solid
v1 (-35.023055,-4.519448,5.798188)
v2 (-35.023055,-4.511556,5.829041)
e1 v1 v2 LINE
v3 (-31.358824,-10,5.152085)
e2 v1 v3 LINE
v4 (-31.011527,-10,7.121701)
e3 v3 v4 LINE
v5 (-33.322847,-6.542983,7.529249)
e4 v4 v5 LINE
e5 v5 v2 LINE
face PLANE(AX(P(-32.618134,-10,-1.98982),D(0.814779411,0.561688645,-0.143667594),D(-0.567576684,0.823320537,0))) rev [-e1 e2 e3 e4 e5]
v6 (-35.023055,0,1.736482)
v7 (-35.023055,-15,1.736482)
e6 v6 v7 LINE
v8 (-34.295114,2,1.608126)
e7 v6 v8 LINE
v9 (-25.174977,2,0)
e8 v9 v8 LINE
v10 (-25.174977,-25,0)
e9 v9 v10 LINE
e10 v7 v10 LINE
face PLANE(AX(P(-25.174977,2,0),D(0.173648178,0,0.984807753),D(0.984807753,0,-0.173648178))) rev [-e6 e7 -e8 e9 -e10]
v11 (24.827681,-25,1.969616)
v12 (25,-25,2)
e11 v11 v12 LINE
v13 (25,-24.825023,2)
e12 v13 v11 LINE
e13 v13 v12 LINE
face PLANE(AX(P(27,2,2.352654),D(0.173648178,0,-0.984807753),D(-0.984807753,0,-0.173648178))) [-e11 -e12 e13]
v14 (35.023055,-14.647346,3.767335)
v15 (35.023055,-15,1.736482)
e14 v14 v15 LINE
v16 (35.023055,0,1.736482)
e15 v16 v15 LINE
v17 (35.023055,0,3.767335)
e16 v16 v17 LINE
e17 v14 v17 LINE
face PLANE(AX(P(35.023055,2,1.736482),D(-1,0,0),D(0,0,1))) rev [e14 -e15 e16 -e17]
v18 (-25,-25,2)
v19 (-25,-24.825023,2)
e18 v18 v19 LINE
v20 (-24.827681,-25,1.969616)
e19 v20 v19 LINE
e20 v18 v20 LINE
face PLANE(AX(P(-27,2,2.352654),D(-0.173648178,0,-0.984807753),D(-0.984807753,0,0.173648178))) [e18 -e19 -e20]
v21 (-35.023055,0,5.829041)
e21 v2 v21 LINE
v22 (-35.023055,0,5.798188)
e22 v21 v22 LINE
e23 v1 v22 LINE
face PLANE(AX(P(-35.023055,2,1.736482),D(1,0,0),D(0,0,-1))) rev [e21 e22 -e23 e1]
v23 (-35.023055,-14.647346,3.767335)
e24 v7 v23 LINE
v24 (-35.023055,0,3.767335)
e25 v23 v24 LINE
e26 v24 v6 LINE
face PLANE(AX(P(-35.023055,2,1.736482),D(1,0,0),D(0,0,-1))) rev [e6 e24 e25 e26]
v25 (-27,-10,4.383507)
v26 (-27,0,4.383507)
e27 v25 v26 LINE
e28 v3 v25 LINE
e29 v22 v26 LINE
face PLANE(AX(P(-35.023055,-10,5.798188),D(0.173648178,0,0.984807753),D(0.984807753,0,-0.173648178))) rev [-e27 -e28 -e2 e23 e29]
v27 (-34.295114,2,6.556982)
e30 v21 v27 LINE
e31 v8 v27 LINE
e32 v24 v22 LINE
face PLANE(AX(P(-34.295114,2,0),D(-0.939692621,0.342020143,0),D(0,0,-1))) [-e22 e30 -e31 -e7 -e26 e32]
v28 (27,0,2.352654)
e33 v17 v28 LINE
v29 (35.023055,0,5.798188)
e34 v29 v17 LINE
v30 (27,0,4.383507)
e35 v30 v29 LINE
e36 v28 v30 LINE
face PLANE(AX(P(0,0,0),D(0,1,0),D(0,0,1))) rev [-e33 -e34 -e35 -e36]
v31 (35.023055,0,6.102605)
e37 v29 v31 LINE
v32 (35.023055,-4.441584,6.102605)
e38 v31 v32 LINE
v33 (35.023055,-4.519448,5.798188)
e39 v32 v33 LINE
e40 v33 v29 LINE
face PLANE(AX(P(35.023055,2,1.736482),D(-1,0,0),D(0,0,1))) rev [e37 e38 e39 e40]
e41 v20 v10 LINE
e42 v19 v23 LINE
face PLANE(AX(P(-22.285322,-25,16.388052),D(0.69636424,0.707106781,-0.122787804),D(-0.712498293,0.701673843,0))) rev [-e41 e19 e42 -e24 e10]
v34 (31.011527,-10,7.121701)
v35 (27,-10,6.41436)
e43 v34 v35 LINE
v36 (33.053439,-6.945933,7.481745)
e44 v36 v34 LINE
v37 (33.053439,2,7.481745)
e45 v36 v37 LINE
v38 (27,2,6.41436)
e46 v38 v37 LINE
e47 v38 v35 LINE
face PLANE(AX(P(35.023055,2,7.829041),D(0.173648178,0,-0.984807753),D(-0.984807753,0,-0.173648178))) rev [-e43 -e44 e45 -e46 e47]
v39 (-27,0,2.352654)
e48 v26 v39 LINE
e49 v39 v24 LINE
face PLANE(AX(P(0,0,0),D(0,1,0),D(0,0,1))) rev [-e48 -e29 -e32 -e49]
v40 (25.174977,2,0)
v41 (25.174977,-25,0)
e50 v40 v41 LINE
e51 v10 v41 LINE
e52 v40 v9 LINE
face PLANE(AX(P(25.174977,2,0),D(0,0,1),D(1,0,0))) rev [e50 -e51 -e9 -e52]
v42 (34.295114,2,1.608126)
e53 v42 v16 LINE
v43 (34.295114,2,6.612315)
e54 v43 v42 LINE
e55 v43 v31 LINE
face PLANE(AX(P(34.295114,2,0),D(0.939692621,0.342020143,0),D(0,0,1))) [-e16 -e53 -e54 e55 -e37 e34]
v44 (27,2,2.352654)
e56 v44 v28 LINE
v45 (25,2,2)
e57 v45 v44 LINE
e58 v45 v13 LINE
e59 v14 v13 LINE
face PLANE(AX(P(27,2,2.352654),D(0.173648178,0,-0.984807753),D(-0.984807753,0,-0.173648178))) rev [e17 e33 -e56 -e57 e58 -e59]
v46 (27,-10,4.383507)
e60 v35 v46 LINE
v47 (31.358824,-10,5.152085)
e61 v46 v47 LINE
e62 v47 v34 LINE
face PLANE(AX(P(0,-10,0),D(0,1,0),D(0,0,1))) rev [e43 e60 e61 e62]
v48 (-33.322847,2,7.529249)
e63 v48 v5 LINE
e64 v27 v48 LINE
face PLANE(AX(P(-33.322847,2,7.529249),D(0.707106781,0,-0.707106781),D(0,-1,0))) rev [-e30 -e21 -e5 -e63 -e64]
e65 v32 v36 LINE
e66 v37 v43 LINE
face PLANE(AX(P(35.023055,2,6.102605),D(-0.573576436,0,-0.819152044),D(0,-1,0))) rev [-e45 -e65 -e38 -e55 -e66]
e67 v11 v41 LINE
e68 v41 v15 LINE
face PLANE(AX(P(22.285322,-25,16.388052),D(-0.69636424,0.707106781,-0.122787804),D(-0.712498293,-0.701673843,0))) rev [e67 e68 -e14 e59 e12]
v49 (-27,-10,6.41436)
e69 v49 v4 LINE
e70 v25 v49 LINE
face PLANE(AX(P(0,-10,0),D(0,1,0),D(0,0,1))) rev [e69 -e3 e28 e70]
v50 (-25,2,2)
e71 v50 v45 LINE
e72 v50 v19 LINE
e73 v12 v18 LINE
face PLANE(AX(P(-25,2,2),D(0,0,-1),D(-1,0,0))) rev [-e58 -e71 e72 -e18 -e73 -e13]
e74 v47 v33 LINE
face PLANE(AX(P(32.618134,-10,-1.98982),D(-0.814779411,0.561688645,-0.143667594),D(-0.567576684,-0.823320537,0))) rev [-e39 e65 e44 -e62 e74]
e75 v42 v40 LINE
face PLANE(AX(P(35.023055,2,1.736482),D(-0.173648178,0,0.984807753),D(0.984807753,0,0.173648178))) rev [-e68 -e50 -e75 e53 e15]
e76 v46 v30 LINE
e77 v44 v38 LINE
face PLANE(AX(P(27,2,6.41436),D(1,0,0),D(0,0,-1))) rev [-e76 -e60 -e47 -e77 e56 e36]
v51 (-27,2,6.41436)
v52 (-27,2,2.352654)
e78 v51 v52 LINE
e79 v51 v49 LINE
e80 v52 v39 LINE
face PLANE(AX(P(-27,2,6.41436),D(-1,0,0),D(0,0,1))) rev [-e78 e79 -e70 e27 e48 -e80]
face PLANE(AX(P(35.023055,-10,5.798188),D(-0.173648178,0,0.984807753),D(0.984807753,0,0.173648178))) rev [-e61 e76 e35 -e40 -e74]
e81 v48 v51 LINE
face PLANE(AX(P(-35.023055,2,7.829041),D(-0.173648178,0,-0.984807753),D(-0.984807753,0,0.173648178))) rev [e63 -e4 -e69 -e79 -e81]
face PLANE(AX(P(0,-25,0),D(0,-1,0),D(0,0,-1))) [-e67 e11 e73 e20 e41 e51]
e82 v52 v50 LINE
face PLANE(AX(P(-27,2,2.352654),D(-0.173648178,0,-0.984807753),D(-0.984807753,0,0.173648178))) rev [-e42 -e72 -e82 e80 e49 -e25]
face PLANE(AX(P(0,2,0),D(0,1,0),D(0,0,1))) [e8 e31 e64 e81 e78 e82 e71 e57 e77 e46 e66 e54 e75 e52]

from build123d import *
from OCP.BRepFilletAPI import BRepFilletAPI_MakeChamfer

# Parameters (mm, degrees)
BOSS_EXTRUDE1_DEPTH = 2
BOSS_EXTRUDE2_DEPTH = 25
BOSS_EXTRUDE3_DEPTH = 10
CUT_EXTRUDE4_DEPTH  = 2
CUT_EXTRUDE5_DEPTH  = 2
CUT_EXTRUDE6_DEPTH  = 2
CUT_EXTRUDE7_DEPTH  = 2
CHAMFER1_SIZE       = 0.727940469
CHAMFER1_SIZE_2     = 2
CHAMFER2_SIZE       = 2
CHAMFER2_SIZE2      = 1.72643598


with BuildPart() as part:
    # Sketch12 → Boss-Extrude1 (new body)
    with BuildSketch(Plane(origin=(0, 0, 0), x_dir=(1, 0, 0), z_dir=(0, 1, 0))):
        Polygon((-27, -6.414360409), (-27, -2.352653961), (-25, -2), (25, -2), (27, -2.352653961), (27, -6.414360409), (35.023054857, -7.829041448), (35.023054857, -1.736481777), (25.174977327, 0), (-25.174977327, 0), (-35.023054857, -1.736481777), (-35.023054857, -7.829041448), align=None)
    extrude(amount=BOSS_EXTRUDE1_DEPTH)

    # Sketch13 → Boss-Extrude2 (add)
    with BuildSketch(Plane.XZ):
        Polygon((25.174977327, 0), (35.023054857, 1.736481777), (35.023054857, 3.767335), (27, 2.352653961), (25, 2), (-25, 2), (-27, 2.352653961), (-35.023054857, 3.767335), (-35.023054857, 1.736481777), (-25.174977327, 0), align=None)
    extrude(amount=BOSS_EXTRUDE2_DEPTH)

    # Sketch14 → Boss-Extrude3 (add)
    with BuildSketch(Plane.XZ):
        Polygon((-35.023054857, 7.829041448), (-27, 6.414360409), (-27, 4.383507185), (-35.023054857, 5.798188224), align=None)
        Polygon((27, 6.414360409), (35.023054857, 7.829041448), (35.023054857, 5.798188224), (27, 4.383507185), align=None)
    extrude(amount=BOSS_EXTRUDE3_DEPTH)

    # Sketch15 → Cut-Extrude4 (cut)
    with BuildSketch(Plane(origin=(0.759118452, 0, -4.305174677), x_dir=(-0.9848077530121055, 0, -0.1736481776675121), z_dir=(0.1736481776675121, 0, -0.9848077530121055))):
        Polygon((-24.792512854, -25), (-35.145166815, -14.647346039), (-35.145166815, -25), align=None)
    extrude(amount=-CUT_EXTRUDE4_DEPTH, mode=Mode.SUBTRACT)

    # Sketch16 → Cut-Extrude5 (cut)
    with BuildSketch(Plane(origin=(-0.759118452, 0, -4.305174677), x_dir=(-0.9848077530121054, 0, 0.17364817766751298), z_dir=(-0.17364817766751298, 0, -0.9848077530121054))):
        Polygon((24.792512854, -25), (35.145166815, -14.647346039), (35.145166815, -25), align=None)
    extrude(amount=-CUT_EXTRUDE5_DEPTH, mode=Mode.SUBTRACT)

    # Sketch18 → Cut-Extrude6 (cut)
    with BuildSketch(Plane(origin=(0.282770614, 0, 1.603671841), x_dir=(0.9848077530121053, 0, -0.17364817766751298), z_dir=(0.173648177667513, 0, 0.9848077530121054))):
        Polygon((-31.777063033, -10), (-35.850474738, -4), (-35.850474738, -10), align=None)
    extrude(amount=-CUT_EXTRUDE6_DEPTH, mode=Mode.SUBTRACT)

    # Sketch19 → Cut-Extrude7 (cut)
    with BuildSketch(Plane(origin=(-0.282770614, 0, 1.603671841), x_dir=(0.9848077530121055, 0, 0.17364817766751214), z_dir=(-0.17364817766751214, 0, 0.9848077530121055))):
        Polygon((31.777063033, -10), (35.850474738, -4), (35.850474738, -10), align=None)
    extrude(amount=-CUT_EXTRUDE7_DEPTH, mode=Mode.SUBTRACT)

    # Chamfer1
    chamfer1_edges_1 = [part.edges().sort_by_distance(p)[0] for p in [
        (-35.023054857, 2, 4.782761612),
    ]]
    chamfer1_side_1 = [part.faces().sort_by_distance(p)[0] for p in [
        (-35.008496048, 2, 4.782761612),
    ]]
    chamfer1_edges_2 = [part.edges().sort_by_distance(p)[0] for p in [
        (35.023054857, 2, 4.782761612),
    ]]
    chamfer1_side_2 = [part.faces().sort_by_distance(p)[0] for p in [
        (35.008496048, 2, 4.782761612),
    ]]
    chamfer1 = BRepFilletAPI_MakeChamfer(part.part.solid().wrapped)
    for e in chamfer1_edges_1:
        chamfer1.Add(CHAMFER1_SIZE - 0.0001, CHAMFER1_SIZE_2 - 0.0001, e.wrapped, chamfer1_side_1[0].wrapped)
    for e in chamfer1_edges_2:
        chamfer1.Add(CHAMFER1_SIZE - 0.0001, CHAMFER1_SIZE_2 - 0.0001, e.wrapped, chamfer1_side_2[0].wrapped)
    add(Compound.cast(chamfer1.Shape()), mode=Mode.REPLACE)  # a hair under: the kernel refuses the full size

    # Chamfer2: one chamfer whose edges measure the first distance from different faces: ONE call of the kernel's chamfer builder (chamfer() names one face for all edges)
    chamfer2_edges_1 = [part.edges().sort_by_distance(p)[0] for p in [
        (-35.023054857, -1.99995, 7.829041448),
    ]]
    chamfer2_side_1 = [part.faces().sort_by_distance(p)[0] for p in [
        (-35.023054857, -6.233576758, 3.65083088),
    ]]
    chamfer2_edges_2 = [part.edges().sort_by_distance(p)[0] for p in [
        (35.023054857, -1.99995, 7.829041448),
    ]]
    chamfer2_side_2 = [part.faces().sort_by_distance(p)[0] for p in [
        (30.593302678, -3.470070419, 7.047956621),
    ]]
    chamfer2 = BRepFilletAPI_MakeChamfer(part.part.solid().wrapped)
    for e in chamfer2_edges_1:
        chamfer2.Add(CHAMFER2_SIZE, CHAMFER2_SIZE2, e.wrapped, chamfer2_side_1[0].wrapped)  # the first distance lies on this face
    for e in chamfer2_edges_2:
        chamfer2.Add(CHAMFER2_SIZE, CHAMFER2_SIZE2, e.wrapped, chamfer2_side_2[0].wrapped)  # the first distance lies on this face
    add(Compound.cast(chamfer2.Shape()), mode=Mode.REPLACE)


solid = part.part
